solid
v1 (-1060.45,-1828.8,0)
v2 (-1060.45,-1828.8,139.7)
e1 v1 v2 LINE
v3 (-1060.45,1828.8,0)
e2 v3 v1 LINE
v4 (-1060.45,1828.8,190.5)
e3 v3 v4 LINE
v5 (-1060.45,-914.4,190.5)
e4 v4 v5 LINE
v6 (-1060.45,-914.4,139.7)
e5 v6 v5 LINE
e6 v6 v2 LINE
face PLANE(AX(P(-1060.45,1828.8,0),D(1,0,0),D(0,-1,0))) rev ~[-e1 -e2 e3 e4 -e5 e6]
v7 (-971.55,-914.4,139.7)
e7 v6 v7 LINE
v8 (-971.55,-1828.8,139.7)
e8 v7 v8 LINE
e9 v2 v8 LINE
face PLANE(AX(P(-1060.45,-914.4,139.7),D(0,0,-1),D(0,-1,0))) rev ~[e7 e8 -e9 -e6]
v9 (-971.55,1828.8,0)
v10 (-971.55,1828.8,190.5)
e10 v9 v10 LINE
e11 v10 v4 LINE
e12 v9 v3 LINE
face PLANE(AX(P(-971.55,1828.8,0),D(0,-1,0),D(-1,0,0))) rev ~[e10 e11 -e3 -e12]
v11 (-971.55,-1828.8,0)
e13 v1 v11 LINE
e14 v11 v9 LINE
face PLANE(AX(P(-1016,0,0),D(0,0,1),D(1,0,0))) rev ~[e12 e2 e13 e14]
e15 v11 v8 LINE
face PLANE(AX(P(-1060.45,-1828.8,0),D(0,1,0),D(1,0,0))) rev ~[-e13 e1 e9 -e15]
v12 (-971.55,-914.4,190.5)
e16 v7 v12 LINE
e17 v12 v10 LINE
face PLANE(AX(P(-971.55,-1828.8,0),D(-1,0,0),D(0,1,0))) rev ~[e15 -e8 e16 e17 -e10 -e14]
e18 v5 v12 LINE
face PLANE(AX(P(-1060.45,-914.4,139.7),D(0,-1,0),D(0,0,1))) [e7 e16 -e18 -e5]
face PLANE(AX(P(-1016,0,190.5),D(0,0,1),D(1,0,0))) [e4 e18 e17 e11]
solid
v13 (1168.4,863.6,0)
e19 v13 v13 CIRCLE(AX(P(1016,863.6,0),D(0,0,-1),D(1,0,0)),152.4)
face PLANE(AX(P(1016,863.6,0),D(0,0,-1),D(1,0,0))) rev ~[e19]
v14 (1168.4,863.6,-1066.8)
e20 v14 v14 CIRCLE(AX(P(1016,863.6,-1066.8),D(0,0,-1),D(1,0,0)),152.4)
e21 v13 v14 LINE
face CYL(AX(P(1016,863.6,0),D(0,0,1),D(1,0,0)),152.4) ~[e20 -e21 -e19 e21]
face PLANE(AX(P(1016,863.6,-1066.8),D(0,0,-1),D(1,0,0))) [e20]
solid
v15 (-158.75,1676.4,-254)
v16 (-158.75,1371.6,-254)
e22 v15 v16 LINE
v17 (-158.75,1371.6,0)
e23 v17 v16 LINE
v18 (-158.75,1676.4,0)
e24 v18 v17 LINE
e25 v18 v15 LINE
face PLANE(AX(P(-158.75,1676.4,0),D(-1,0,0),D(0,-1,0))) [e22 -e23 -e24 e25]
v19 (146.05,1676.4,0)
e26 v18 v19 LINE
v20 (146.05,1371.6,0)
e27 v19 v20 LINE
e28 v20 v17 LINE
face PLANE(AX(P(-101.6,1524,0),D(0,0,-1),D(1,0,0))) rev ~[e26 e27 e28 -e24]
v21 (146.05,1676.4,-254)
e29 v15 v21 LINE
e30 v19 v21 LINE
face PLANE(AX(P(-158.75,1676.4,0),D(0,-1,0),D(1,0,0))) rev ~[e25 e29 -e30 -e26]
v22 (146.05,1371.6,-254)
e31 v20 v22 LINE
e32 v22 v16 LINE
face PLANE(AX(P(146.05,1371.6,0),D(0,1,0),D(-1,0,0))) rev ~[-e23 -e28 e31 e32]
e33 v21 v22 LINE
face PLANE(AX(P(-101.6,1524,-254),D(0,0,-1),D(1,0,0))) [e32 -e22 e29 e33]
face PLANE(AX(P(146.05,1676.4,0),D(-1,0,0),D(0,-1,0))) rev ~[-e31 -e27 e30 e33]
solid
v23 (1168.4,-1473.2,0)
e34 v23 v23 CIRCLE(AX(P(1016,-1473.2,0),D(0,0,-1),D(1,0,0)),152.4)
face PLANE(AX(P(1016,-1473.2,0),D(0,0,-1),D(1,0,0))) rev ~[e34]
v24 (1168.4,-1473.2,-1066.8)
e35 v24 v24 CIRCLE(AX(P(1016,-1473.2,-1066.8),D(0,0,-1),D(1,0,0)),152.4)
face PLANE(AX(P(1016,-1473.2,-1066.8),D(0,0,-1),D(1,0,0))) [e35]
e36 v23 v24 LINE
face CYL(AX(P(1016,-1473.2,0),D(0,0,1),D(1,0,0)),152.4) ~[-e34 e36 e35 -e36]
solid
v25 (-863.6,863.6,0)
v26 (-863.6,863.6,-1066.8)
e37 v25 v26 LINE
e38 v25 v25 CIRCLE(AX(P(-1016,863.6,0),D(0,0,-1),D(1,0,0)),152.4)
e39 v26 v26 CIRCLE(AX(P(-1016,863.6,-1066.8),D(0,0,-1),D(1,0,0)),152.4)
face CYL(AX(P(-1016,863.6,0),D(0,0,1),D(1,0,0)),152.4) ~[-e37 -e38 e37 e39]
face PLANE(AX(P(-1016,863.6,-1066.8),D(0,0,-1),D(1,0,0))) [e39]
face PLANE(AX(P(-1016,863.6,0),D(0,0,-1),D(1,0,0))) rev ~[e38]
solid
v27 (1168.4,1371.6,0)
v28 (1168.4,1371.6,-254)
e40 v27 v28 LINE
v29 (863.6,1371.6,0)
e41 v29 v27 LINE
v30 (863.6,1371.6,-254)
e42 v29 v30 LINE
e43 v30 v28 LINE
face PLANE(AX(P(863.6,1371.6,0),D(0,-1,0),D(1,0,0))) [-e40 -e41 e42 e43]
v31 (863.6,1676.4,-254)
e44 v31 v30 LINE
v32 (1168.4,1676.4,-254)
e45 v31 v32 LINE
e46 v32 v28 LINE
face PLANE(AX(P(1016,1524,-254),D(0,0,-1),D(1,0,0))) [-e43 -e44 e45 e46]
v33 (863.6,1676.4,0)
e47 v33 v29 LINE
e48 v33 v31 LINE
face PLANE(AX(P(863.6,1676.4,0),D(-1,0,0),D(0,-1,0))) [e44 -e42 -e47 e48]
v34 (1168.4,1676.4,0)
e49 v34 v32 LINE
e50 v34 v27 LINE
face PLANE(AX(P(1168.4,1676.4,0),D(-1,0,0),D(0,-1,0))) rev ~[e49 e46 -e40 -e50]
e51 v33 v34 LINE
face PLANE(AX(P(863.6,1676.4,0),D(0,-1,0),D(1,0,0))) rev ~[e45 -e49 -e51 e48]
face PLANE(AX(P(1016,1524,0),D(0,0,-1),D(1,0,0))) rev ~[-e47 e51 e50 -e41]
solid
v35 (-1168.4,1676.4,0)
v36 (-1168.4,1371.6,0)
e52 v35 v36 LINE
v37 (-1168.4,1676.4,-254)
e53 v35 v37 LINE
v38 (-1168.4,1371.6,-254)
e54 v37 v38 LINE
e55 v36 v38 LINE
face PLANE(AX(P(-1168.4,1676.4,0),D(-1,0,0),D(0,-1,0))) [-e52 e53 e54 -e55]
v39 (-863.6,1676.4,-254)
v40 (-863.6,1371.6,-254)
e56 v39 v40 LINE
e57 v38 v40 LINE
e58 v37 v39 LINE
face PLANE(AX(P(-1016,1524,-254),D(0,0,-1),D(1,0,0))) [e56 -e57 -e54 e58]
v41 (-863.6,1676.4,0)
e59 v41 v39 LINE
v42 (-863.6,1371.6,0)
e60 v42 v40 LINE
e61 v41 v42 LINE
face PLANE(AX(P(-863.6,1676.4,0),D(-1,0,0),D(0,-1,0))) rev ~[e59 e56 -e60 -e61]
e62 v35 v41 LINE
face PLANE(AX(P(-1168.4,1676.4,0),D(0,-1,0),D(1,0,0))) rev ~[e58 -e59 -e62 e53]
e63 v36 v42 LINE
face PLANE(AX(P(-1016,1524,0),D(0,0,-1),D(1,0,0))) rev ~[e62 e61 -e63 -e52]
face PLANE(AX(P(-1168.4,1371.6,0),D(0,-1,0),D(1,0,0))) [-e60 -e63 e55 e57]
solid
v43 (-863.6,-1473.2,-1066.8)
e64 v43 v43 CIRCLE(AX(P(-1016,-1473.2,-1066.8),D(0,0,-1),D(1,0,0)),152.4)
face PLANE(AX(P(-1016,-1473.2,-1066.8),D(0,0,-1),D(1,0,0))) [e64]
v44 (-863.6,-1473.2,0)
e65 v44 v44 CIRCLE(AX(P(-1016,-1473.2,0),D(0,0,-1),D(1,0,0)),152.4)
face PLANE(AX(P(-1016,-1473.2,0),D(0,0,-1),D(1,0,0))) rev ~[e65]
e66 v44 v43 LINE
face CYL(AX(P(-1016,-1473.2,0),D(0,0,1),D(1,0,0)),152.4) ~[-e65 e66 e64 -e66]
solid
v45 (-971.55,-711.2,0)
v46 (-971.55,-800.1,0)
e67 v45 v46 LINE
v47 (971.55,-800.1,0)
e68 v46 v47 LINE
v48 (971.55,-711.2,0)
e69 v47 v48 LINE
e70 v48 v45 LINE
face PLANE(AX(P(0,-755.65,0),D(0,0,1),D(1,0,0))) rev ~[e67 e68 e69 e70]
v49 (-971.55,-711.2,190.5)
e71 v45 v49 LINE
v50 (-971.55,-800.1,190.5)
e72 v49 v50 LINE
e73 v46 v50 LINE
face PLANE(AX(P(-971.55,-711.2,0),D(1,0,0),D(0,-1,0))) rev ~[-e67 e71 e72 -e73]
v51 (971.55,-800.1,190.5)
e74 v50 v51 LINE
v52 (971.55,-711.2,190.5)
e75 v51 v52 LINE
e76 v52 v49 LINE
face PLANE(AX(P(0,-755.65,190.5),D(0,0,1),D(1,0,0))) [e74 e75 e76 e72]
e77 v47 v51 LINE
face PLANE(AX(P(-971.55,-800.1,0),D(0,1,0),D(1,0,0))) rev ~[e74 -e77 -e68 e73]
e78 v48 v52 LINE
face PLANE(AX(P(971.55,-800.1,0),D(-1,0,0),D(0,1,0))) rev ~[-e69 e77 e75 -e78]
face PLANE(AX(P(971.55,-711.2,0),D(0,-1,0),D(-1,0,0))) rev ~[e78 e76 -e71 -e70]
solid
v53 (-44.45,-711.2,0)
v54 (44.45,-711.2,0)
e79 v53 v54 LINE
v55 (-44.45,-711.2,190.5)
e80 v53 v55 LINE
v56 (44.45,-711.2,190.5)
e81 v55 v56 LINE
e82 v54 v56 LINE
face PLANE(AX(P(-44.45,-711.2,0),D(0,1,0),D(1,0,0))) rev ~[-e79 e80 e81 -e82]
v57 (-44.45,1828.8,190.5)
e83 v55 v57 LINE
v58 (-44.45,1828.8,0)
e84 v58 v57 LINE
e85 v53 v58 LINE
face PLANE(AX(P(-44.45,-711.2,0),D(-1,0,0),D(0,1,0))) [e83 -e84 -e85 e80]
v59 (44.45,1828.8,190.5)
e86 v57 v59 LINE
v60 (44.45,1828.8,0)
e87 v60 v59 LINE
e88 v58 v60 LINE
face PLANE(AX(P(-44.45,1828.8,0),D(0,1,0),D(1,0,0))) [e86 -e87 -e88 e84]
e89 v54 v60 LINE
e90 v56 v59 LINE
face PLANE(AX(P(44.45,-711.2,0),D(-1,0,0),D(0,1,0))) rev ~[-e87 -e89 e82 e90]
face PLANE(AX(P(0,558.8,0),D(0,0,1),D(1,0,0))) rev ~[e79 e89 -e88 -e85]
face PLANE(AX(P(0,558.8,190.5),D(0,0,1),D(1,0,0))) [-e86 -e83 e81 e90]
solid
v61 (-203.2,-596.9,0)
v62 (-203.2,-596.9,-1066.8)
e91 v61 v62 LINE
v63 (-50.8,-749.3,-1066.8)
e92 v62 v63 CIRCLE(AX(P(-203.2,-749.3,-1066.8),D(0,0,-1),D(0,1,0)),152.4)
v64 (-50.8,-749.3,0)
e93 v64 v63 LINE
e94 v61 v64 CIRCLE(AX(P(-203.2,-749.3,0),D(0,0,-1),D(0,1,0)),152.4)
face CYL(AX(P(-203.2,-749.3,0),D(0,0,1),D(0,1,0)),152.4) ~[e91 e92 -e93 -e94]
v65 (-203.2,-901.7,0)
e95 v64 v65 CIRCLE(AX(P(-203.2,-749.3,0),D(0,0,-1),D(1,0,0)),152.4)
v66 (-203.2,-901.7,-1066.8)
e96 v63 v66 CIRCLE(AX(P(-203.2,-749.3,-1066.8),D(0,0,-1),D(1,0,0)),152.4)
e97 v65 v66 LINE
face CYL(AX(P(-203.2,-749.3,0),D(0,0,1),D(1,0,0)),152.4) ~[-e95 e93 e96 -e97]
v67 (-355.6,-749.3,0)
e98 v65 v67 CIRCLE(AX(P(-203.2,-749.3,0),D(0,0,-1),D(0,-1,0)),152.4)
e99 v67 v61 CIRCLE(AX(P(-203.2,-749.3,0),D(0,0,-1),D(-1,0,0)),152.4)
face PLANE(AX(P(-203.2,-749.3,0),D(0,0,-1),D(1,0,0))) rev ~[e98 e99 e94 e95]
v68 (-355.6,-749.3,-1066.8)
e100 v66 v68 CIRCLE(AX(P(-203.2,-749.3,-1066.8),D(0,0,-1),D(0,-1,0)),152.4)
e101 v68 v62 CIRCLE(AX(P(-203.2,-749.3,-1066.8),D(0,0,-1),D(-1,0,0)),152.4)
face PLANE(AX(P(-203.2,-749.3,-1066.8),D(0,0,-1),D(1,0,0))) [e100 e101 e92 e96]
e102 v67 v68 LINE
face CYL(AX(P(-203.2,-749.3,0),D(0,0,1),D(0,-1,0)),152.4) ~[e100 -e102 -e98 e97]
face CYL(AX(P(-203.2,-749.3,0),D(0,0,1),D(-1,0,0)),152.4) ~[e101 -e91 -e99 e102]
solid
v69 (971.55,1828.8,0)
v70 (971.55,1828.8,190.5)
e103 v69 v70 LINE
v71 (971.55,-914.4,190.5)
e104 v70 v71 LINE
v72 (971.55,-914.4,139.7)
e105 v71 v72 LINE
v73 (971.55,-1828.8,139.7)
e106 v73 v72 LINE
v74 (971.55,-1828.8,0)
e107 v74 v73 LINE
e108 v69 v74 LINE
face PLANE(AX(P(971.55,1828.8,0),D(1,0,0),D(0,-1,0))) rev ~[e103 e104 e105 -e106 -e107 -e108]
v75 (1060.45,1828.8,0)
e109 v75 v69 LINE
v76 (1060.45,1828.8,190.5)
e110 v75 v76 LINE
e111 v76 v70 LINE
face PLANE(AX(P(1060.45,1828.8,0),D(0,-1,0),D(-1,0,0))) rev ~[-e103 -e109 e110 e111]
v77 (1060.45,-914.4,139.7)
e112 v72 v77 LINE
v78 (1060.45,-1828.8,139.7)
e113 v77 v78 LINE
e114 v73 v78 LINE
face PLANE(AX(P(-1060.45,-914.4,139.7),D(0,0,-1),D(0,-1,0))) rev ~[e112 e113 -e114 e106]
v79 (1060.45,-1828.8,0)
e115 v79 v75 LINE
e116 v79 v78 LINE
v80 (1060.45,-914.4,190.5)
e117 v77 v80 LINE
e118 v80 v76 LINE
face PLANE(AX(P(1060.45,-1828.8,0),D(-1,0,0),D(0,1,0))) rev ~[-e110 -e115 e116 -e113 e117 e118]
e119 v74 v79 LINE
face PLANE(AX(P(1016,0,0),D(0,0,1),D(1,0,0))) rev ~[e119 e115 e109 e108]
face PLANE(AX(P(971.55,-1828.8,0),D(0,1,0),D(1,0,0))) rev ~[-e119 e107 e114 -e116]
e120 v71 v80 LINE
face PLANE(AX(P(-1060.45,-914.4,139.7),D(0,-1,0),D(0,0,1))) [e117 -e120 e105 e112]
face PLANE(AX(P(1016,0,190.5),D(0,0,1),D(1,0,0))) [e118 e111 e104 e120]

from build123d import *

# Parameters (mm, degrees)
F1_DEPTH  = 190.5
F2_DEPTH  = 190.5
F0_W      = 88.9
F0_H      = 2540
F3_DEPTH  = 190.5
F5_W      = 914.4
F5_H      = 50.8
F6_DEPTH  = 2120.901
F4_W      = 914.4
F4_H      = 50.8
F7_DEPTH  = 2120.901
F8_R      = 152.4
F9_DEPTH  = 1066.8
F10_DEPTH = 1066.8
F11_DEPTH = 1066.8
F12_DEPTH = 1066.8
F13_DEPTH = 1066.8
F14_DEPTH = 190.5
F8_W      = 304.8
F8_H      = 304.8
F15_DEPTH = 254
F8_W_2    = 114.3
F8_W_3    = 88.9
F8_W_4    = 101.6


with BuildPart() as f1:
    # F0 (on Top) → F1 (new body)
    with BuildSketch(Plane.XY):
        Polygon((-1060.45, -1828.8), (-971.55, -1828.8), (-971.55, -800.1), (-971.55, -711.2), (-971.55, 1828.8), (-1060.45, 1828.8), align=None)
    extrude(amount=F1_DEPTH)


with BuildPart() as f2:
    # F0 (on Top) → F2 (new body)
    with BuildSketch(Plane.XY):
        Polygon((971.55, -711.2), (971.55, -800.1), (971.55, -1828.8), (1060.45, -1828.8), (1060.45, 1828.8), (971.55, 1828.8), align=None)
    extrude(amount=F2_DEPTH)


with BuildPart() as f3:
    # F0 (on Top) → F3 (new body)
    with BuildSketch(Plane.XY):
        with Locations((0, 558.8)):
            Rectangle(F0_W, F0_H)
    extrude(amount=F3_DEPTH)


with BuildPart() as f6_tool:
    # F5 (on face) → F6 (new body, through all)
    with BuildSketch(Plane(origin=(-1060.45, 0, 0), x_dir=(0, -1, 0), z_dir=(-1, 0, 0))):
        with Locations((1371.6, 165.1)):
            Rectangle(F5_W, F5_H)
    extrude(amount=-F6_DEPTH)


with BuildPart() as f1_1:
    add(f1.part)

    # F6: cut by f6_tool
    add(f6_tool.part, mode=Mode.SUBTRACT)

    # F4 (on face) → F7 (cut, through all)
    with BuildSketch(Plane.YZ.offset(1060.45)):
        with Locations((-1371.6, 165.1)):
            Rectangle(F4_W, F4_H)
    extrude(amount=-F7_DEPTH, mode=Mode.SUBTRACT)


with BuildPart() as f2_1:
    add(f2.part)

    # F6: cut by f6_tool
    add(f6_tool.part, mode=Mode.SUBTRACT)


with BuildPart() as f9:
    # F8 (on face) → F9 (new body)
    with BuildSketch(Plane(origin=(0, 0, 0), x_dir=(1, 0, 0), z_dir=(0, 0, -1))):
        with Locations((-1016, 1473.2)):
            Circle(F8_R)
    extrude(amount=F9_DEPTH)


with BuildPart() as f10:
    # F8 (on face) → F10 (new body)
    with BuildSketch(Plane(origin=(0, 0, 0), x_dir=(1, 0, 0), z_dir=(0, 0, -1))):
        with Locations((1016, 1473.2)):
            Circle(F8_R)
    extrude(amount=F10_DEPTH)


with BuildPart() as f11:
    # F8 (on face) → F11 (new body)
    with BuildSketch(Plane(origin=(0, 0, 0), x_dir=(1, 0, 0), z_dir=(0, 0, -1))):
        with Locations((1016, -863.6)):
            Circle(F8_R)
    extrude(amount=F11_DEPTH)


with BuildPart() as f12:
    # F8 (on face) → F12 (new body)
    with BuildSketch(Plane(origin=(0, 0, 0), x_dir=(1, 0, 0), z_dir=(0, 0, -1))):
        with Locations((-1016, -863.6)):
            Circle(F8_R)
    extrude(amount=F12_DEPTH)


with BuildPart() as f13:
    # F8 (on face) → F13 (new body)
    with BuildSketch(Plane(origin=(0, 0, 0), x_dir=(1, 0, 0), z_dir=(0, 0, -1))):
        with BuildLine():
            ThreePointArc((-203.2, 596.9), (-95.4369265472, 641.5369265472), (-50.8, 749.3))
            ThreePointArc((-50.8, 749.3), (-95.4369265472, 857.0630734528), (-203.2, 901.7))
            ThreePointArc((-203.2, 901.7), (-310.9630734528, 857.0630734528), (-355.6, 749.3))
            ThreePointArc((-355.6, 749.3), (-310.9630734528, 641.5369265472), (-203.2, 596.9))
        make_face()
    extrude(amount=F13_DEPTH)


with BuildPart() as f14:
    # F0 (on Top) → F14 (new body)
    with BuildSketch(Plane.XY):
        Polygon((-971.55, -711.2), (-971.55, -800.1), (971.55, -800.1), (971.55, -711.2), (44.45, -711.2), (-44.45, -711.2), align=None)
    extrude(amount=F14_DEPTH)


with BuildPart() as f15:
    # F8 (on face) → F15 (new body)
    with BuildSketch(Plane(origin=(0, 0, 0), x_dir=(1, 0, 0), z_dir=(0, 0, -1))):
        with Locations((1016, -1524)):
            Rectangle(F8_W, F8_H)
    extrude(amount=F15_DEPTH)


with BuildPart() as f15b:
    # F8 (on face) → F15, piece 2 (new body)
    with BuildSketch(Plane(origin=(0, 0, 0), x_dir=(1, 0, 0), z_dir=(0, 0, -1))):
        with Locations((-1016, -1524)):
            Rectangle(F8_W, F8_H)
    extrude(amount=F15_DEPTH)


with BuildPart() as f15c:
    # F8 (on face) → F15, piece 3 (new body)
    with BuildSketch(Plane(origin=(0, 0, 0), x_dir=(1, 0, 0), z_dir=(0, 0, -1))):
        with Locations((-101.6, -1524)):
            Rectangle(F8_W_2, F8_H)
        with Locations((0, -1524)):
            Rectangle(F8_W_3, F8_H)
        with Locations((95.25, -1524)):
            Rectangle(F8_W_4, F8_H)
    extrude(amount=F15_DEPTH)


solid = Compound([f3.part, f1_1.part, f2_1.part, f9.part, f10.part, f11.part, f12.part, f13.part, f14.part, f15.part, f15b.part, f15c.part])
